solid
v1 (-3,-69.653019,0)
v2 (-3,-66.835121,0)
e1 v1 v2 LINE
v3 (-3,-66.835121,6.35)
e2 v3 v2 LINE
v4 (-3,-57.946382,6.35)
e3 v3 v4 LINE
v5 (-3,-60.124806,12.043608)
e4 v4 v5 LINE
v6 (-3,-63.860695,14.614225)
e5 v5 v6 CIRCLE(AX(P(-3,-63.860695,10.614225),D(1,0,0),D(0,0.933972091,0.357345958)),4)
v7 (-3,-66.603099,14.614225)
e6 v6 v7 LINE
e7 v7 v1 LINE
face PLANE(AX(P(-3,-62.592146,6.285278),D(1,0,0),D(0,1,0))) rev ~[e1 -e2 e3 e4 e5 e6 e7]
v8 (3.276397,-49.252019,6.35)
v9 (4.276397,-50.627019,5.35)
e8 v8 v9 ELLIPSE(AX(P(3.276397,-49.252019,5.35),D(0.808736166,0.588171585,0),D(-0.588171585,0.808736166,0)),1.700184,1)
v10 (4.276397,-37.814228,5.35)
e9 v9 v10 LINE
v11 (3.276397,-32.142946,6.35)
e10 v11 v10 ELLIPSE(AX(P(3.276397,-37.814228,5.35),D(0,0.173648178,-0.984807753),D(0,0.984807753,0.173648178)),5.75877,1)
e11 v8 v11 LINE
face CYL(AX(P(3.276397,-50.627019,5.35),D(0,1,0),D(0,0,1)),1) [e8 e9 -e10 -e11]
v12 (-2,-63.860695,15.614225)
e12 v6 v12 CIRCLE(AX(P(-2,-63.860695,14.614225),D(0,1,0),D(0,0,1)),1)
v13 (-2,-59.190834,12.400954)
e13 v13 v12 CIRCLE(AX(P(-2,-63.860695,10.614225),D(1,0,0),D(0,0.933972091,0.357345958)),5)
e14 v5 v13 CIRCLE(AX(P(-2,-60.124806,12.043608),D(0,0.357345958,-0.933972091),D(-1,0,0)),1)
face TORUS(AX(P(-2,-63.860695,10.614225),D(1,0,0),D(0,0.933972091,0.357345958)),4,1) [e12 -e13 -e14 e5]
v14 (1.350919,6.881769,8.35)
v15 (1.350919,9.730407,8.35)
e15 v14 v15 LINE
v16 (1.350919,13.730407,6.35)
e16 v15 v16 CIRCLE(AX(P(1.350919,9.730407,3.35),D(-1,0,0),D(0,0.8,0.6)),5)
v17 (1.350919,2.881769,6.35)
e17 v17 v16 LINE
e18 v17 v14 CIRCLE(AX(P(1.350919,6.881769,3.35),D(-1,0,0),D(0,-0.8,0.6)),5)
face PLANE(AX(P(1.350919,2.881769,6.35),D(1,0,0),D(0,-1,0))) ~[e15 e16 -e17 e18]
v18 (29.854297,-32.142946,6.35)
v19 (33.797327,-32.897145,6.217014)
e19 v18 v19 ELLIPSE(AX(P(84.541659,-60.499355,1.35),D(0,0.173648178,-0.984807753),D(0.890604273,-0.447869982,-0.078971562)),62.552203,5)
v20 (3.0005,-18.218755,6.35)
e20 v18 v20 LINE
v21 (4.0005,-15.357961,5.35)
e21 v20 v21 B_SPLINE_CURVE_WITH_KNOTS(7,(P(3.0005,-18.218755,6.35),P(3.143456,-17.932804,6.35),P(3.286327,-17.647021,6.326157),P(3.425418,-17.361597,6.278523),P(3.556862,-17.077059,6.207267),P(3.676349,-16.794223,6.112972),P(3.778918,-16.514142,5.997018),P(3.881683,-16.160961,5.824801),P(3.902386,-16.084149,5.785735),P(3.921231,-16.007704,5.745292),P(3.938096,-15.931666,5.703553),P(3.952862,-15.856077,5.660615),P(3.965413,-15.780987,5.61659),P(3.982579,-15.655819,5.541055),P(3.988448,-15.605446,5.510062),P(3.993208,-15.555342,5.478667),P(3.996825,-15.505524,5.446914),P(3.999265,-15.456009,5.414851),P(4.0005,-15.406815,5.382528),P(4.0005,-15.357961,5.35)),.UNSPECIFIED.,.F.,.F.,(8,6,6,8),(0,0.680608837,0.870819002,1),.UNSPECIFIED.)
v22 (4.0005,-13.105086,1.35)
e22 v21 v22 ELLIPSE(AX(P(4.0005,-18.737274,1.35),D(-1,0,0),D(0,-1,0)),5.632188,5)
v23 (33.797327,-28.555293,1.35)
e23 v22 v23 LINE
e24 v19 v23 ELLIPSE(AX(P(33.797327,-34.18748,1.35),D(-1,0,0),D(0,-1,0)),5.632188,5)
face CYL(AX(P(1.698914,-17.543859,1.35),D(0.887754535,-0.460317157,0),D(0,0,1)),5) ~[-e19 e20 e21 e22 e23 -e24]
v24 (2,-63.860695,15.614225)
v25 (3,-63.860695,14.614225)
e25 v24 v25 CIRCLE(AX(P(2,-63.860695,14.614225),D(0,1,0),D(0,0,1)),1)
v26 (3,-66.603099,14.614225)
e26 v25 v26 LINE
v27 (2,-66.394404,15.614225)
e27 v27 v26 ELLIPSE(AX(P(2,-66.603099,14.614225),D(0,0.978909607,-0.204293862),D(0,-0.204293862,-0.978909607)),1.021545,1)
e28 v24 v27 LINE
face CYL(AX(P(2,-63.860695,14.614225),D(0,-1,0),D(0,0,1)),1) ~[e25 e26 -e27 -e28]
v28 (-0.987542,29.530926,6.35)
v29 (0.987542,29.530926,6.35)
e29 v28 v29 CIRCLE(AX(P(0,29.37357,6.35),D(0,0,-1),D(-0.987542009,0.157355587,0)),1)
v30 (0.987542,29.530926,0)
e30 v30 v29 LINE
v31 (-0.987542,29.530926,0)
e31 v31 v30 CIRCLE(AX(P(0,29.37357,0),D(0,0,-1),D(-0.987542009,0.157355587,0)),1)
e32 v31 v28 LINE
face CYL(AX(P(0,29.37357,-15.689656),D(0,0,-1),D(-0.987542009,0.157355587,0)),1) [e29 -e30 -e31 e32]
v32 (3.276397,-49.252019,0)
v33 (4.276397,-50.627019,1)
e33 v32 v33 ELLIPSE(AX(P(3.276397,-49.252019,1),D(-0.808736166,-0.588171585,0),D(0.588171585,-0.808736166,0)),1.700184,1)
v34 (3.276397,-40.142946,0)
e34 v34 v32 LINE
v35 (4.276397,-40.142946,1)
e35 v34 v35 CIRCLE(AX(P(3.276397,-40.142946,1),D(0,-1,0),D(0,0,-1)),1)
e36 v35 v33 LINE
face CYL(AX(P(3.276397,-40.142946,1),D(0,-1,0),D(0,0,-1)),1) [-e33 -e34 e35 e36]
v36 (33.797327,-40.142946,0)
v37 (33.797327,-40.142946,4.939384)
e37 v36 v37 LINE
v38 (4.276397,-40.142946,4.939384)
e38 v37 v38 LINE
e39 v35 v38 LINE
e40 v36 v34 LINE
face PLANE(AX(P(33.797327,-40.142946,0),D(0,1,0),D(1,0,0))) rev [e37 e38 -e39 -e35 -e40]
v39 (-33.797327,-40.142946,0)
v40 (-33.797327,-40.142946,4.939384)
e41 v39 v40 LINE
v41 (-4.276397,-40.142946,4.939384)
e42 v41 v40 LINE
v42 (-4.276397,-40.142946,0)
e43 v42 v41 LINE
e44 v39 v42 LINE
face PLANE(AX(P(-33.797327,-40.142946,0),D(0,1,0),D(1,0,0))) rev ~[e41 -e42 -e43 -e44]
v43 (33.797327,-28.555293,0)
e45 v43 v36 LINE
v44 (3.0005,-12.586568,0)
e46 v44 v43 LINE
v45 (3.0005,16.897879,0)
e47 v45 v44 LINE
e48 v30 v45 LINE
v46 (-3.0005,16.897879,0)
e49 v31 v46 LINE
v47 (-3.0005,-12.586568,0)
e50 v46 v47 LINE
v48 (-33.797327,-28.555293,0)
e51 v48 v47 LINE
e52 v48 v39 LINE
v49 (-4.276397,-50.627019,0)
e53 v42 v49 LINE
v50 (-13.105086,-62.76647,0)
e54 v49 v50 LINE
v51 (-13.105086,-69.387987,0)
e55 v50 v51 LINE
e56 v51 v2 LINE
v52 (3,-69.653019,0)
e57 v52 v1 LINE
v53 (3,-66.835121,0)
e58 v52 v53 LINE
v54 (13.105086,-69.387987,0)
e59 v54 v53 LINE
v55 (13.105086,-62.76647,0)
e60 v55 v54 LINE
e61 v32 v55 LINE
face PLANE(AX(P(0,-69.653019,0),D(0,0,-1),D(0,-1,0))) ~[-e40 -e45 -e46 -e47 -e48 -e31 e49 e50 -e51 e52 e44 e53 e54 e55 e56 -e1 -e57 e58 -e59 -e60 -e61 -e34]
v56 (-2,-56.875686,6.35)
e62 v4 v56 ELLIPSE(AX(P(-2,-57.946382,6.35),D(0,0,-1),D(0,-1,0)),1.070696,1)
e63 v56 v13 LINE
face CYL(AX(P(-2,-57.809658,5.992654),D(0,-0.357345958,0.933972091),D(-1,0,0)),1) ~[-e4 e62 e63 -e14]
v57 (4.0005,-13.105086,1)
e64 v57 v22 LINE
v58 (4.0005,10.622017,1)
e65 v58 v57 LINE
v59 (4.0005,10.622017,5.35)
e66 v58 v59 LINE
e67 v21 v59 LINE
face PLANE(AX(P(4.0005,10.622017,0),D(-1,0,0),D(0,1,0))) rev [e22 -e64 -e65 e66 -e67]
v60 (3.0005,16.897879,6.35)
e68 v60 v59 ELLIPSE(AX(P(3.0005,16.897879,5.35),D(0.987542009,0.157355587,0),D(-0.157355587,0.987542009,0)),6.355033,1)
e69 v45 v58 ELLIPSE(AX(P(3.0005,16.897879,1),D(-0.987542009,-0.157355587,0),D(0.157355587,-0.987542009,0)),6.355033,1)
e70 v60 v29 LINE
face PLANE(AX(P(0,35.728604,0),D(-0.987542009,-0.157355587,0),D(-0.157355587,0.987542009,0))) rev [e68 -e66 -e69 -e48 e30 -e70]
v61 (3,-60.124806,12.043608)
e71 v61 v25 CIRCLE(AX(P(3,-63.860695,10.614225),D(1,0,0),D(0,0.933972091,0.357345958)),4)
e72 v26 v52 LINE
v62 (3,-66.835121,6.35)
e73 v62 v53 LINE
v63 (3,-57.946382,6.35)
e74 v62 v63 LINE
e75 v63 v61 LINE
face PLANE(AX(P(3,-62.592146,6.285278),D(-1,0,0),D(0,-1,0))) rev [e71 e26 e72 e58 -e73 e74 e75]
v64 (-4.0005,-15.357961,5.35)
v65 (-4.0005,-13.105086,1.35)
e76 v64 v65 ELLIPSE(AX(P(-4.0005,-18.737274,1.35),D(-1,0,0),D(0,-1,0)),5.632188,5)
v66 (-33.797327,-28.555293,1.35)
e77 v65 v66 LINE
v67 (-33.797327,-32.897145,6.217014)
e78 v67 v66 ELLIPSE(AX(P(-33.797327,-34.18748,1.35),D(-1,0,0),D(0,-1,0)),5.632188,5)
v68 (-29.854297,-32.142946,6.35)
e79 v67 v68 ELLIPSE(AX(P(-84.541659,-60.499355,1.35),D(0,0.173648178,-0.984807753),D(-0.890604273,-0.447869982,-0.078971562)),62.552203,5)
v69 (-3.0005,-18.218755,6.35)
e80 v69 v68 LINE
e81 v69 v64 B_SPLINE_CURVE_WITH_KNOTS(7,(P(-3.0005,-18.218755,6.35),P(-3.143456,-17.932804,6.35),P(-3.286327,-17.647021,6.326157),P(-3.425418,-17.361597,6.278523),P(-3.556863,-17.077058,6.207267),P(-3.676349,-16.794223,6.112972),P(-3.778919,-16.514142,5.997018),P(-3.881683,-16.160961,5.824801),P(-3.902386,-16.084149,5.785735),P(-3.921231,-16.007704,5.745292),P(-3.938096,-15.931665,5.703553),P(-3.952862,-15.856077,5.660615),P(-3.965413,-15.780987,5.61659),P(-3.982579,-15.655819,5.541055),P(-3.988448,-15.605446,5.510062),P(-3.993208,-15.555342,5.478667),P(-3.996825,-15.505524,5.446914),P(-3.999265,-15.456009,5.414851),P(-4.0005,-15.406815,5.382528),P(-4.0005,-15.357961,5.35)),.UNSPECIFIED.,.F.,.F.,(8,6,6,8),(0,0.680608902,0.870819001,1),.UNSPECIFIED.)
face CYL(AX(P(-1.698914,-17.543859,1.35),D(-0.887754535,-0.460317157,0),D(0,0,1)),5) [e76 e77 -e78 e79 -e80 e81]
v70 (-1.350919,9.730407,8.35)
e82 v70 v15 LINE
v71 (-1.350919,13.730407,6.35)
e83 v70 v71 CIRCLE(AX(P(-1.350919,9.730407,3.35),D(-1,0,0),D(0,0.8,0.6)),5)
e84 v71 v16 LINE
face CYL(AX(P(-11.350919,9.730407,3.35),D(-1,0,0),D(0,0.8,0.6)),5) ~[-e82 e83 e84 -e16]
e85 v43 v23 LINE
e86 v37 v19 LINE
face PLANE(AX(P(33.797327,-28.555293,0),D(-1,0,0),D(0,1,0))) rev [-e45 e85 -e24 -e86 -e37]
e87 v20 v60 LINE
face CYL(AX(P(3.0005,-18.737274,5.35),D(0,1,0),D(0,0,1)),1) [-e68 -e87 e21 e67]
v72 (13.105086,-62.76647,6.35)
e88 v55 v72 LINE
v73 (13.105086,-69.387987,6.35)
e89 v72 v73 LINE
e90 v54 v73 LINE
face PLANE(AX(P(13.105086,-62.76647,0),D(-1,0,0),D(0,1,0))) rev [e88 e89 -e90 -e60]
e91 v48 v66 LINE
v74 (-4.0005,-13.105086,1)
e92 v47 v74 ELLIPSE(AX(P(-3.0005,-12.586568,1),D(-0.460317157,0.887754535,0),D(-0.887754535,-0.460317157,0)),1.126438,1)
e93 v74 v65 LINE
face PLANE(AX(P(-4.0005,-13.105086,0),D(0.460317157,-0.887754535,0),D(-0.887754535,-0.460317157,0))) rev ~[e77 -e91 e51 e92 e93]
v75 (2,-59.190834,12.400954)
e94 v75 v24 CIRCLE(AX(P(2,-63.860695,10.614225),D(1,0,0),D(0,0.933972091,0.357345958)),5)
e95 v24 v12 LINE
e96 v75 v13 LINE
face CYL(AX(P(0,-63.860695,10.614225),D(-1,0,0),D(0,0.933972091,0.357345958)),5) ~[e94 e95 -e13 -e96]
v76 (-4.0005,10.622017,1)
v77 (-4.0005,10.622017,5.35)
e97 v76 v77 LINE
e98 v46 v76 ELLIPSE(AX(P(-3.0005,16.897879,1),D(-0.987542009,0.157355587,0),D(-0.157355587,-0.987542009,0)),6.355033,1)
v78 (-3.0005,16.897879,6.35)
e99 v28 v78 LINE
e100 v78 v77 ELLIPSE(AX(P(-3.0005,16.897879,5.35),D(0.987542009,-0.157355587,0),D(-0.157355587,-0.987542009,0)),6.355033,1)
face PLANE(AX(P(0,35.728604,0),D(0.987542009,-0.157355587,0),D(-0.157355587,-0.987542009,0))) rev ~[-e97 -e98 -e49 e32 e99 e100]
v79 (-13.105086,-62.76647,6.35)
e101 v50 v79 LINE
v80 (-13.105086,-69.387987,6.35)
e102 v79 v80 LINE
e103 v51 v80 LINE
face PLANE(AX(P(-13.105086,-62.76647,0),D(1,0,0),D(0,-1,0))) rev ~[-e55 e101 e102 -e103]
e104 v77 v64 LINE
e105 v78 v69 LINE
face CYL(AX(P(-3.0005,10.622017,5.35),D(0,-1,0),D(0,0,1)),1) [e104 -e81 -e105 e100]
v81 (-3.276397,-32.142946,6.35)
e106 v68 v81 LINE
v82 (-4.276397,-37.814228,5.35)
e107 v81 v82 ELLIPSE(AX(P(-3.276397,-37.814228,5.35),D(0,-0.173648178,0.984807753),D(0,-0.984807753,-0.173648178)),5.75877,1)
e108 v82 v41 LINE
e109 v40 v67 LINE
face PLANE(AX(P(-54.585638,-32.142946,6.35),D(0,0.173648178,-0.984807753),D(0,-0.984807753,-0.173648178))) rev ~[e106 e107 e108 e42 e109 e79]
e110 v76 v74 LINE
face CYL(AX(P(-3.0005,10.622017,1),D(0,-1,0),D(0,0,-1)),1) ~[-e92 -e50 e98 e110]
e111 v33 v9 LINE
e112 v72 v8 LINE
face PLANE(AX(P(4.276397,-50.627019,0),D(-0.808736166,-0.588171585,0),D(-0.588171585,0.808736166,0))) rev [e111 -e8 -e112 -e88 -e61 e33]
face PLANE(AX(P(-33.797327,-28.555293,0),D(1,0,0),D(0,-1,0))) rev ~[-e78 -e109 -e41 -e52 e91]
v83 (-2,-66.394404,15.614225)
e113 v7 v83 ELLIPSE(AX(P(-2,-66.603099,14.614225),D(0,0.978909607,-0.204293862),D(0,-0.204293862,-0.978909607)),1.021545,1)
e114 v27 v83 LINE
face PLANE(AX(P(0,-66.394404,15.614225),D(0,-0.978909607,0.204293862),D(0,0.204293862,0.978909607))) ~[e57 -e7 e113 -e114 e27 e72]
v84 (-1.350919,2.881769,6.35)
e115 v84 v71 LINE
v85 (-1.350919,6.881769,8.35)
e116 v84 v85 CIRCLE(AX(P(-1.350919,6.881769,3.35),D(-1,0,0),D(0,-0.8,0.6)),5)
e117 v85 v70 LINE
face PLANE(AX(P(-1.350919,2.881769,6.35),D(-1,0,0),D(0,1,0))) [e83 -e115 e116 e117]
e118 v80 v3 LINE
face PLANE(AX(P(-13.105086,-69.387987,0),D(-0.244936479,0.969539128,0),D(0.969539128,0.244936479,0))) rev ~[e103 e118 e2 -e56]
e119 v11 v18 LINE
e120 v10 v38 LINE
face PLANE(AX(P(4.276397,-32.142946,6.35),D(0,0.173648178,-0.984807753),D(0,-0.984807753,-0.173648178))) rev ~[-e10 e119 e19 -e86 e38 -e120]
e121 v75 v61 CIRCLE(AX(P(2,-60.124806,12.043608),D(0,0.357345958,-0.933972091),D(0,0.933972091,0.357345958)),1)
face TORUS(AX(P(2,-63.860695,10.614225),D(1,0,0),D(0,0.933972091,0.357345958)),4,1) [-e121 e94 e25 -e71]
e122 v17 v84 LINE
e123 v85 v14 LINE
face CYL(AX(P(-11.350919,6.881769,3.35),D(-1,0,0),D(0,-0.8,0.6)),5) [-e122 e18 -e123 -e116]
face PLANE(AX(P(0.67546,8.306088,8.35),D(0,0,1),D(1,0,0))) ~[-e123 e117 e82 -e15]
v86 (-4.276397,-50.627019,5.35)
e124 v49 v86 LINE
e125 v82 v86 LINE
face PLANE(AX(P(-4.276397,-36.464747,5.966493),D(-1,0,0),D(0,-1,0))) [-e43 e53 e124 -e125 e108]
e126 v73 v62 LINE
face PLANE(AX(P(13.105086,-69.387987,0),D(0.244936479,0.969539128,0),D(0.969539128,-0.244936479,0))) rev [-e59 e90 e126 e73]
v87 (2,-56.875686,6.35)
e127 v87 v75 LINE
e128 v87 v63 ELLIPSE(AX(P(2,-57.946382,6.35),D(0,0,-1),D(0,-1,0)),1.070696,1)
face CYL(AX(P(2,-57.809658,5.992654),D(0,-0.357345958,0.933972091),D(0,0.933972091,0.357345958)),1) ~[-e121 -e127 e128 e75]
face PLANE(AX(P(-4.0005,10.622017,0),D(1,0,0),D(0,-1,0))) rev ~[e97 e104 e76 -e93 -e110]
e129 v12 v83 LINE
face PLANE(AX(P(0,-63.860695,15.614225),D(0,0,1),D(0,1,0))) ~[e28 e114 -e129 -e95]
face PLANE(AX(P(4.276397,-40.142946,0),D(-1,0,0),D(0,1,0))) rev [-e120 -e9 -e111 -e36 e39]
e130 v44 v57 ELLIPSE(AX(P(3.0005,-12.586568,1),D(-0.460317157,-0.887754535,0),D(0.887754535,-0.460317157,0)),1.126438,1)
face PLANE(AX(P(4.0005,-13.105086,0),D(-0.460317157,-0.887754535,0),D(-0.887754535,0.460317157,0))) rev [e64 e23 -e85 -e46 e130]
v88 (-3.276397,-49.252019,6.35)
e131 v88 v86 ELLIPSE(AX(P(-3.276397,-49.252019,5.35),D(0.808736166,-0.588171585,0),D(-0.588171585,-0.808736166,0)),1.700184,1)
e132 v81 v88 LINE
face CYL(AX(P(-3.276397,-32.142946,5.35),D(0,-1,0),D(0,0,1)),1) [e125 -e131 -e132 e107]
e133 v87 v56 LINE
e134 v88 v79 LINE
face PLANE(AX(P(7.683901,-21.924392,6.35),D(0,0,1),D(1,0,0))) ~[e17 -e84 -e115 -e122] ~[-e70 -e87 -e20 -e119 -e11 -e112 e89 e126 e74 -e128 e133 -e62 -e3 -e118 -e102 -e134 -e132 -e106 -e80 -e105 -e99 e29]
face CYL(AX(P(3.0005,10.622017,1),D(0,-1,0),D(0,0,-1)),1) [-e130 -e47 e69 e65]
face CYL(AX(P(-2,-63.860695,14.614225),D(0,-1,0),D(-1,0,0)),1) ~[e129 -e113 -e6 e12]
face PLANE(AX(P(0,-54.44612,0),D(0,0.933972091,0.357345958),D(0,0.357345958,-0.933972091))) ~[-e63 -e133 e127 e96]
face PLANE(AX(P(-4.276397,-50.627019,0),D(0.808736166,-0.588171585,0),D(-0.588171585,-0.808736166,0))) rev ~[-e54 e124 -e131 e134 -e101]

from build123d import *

# Parameters (mm, degrees)
F1_DEPTH      = 6.35
F2_W          = 1.3509193668
F2_H          = 10.8486381359
F3_DEPTH      = 2
F5_DEPTH      = 3
F7_R          = 5
F8_T1_DEPTH   = 22.7018387336
F9_T1_DEPTH   = 22.7018387336
F10_T1_DEPTH  = 37.7293119504
F11_T1_DEPTH  = 50.3092406281
F11_T3_DEPTH  = 50.3092406281
F11_T8_DEPTH  = 71.0975509994
F11_T13_DEPTH = 71.0975509994
F12_R         = 1
F13_R         = 1
F14_R         = 1
F15_R         = 1


# Not quite as in the source:
# - a fillet or chamfer that OpenCascade refuses, or shapes differently, is made with other operations: its cross-section is extruded or revolved along the edge and cut away or added


with BuildPart() as f1:
    # F0 (on Top) → F1 (new body)
    with BuildSketch(Plane.XY):
        Polygon((0, -66.0772249103), (0, 35.7286036015), (-4.0004998446, 10.6220170856), (-4.0004998446, -13.1050860509), (-33.7973274291, -28.5552926362), (-33.7973274291, -40.1429459453), (-4.2763971724, -40.1429459453), (-4.2763971724, -50.6270192564), (-13.1050860509, -62.766470015), (-13.1050860509, -69.3879872561), align=None)
    extrude(amount=F1_DEPTH)

    # F2 (on face) → F3 (join)
    with BuildSketch(Plane.XY.offset(6.35)):
        with Locations((-0.6754596834, 8.3060876932)):
            Rectangle(F2_W, F2_H)
    extrude(amount=F3_DEPTH)

    # F4 (on Right) → F5 (join)
    with BuildSketch(Plane.YZ):
        with BuildLine():
            Line((-69.653019309, 0), (-54.4461198151, 0))
            Line((-54.4461198151, 0), (-59.1908343158, 12.4009543867))
            ThreePointArc((-59.1908343158, 12.4009543867), (-61.0264090525, 14.733305135), (-63.8606947699, 15.6142245978))
            Line((-63.8606947699, 15.6142245978), (-66.3944035769, 15.6142245978))
            Line((-66.3944035769, 15.6142245978), (-69.653019309, 0))
        make_face()
    extrude(amount=-F5_DEPTH)

    # F6: F1 across face


with BuildPart() as f1_1:
    add(f1.part)
    add(f1.part.mirror(Plane(origin=(0, -20.6881401181, 4.0270783), x_dir=(0, 1, 0), z_dir=(1, 0, 0))))

    # F7
    f7_edges = [f1_1.edges().sort_by_distance(p)[0] for p in [
        (-18.898914, -20.830189, 6.35),
        (18.898914, -20.830189, 6.35),
    ]]
    fillet(f7_edges, radius=F7_R)

    # F8: fillet of radius 5 on 1 edges, made by hand

    # F8_s2 → F8_t1 (cut)
    with BuildSketch(Plane.YZ.offset(-11.3509193668)):
        with BuildLine():
            ThreePointArc((13.7304067612, 6.35), (11.9664747387, 7.822135955), (9.7304067612, 8.35))
            Line((9.7304067612, 8.35), (13.7304067612, 8.35))
            Line((13.7304067612, 8.35), (13.7304067612, 6.35))
        make_face()
    extrude(amount=F8_T1_DEPTH, mode=Mode.SUBTRACT)

    # F9: fillet of radius 5 on 1 edges, made by hand

    # F9_s2 → F9_t1 (cut)
    with BuildSketch(Plane.YZ.offset(-11.3509193668)):
        with BuildLine():
            ThreePointArc((2.8817686252, 6.35), (4.6457006477, 7.822135955), (6.8817686252, 8.35))
            Line((6.8817686252, 8.35), (2.8817686252, 8.35))
            Line((2.8817686252, 8.35), (2.8817686252, 6.35))
        make_face()
    extrude(amount=F9_T1_DEPTH, mode=Mode.SUBTRACT)

    # F10: fillet of radius 1 on 1 edges, made by hand

    # F10_s2 → F10_t1 (cut)
    with BuildSketch(Plane.XY.offset(-15.6896559752)):
        with BuildLine():
            ThreePointArc((-0.9875420089, 29.5309258493), (0, 30.3735702625), (0.9875420089, 29.5309258493))
            Line((0.9875420089, 29.5309258493), (0, 35.7286036015))
            Line((0, 35.7286036015), (-0.9875420089, 29.5309258493))
        make_face()
    extrude(amount=F10_T1_DEPTH, mode=Mode.SUBTRACT)

    # F11: chamfer of 8 x 1.4106158457 on 2 edges, made by hand

    # F11_s2 → F11_t1 (cut)
    with BuildSketch(Plane.YZ.offset(-54.5856378004)):
        Polygon((-32.1429459453, 6.35), (-40.1429459453, 4.9393841543), (-40.1429459453, 6.35), align=None)
    extrude(amount=F11_T1_DEPTH, mode=Mode.SUBTRACT)

    # F11_s4 → F11_t3 (cut)
    with BuildSketch(Plane.YZ.offset(4.2763971724)):
        Polygon((-32.1429459453, 6.35), (-40.1429459453, 4.9393841543), (-40.1429459453, 6.35), align=None)
    extrude(amount=F11_T3_DEPTH, mode=Mode.SUBTRACT)


with BuildPart() as f11_tool6:
    # F11_s7 → F11_t8 (new body)
    with BuildSketch(Plane.YZ.offset(-54.5856378004)):
        Polygon((-32.1429459453, 6.35), (-40.1429459453, 4.9393841543), (-40.1429459453, 6.35), align=None)
    extrude(amount=F11_T8_DEPTH)

    split(bisect_by=Plane.YZ.offset(4.2763971724), keep=Keep.TOP)


with BuildPart() as f1_2:
    add(f1_1.part)

    # F11_t5: cut F11_tool6
    add(f11_tool6.part, mode=Mode.SUBTRACT)


with BuildPart() as f11_tool11:
    # F11_s12 → F11_t13 (new body)
    with BuildSketch(Plane.YZ.offset(54.5856378004)):
        Polygon((-32.1429459453, 6.35), (-40.1429459453, 4.9393841543), (-40.1429459453, 6.35), align=None)
    extrude(amount=-F11_T13_DEPTH)

    split(bisect_by=Plane.YZ.offset(-4.2763971724), keep=Keep.BOTTOM)


with BuildPart() as f1_3:
    add(f1_2.part)

    # F11_t10: cut F11_tool11
    add(f11_tool11.part, mode=Mode.SUBTRACT)

    # F12
    f12_edges = [f1_3.edges().sort_by_distance(p)[0] for p in [
        (-3, -58.03326, 9.375477),
    ]]
    fillet(f12_edges, radius=F12_R)

    # F13
    f13_edges = [f1_3.edges().sort_by_distance(p)[0] for p in [
        (3, -58.03326, 9.375477),
    ]]
    fillet(f13_edges, radius=F13_R)

    # F14
    f14_edges = [f1_3.edges().sort_by_distance(p)[0] for p in [
        (4.0005, -4.057628, 6.35),
        (-4.0005, -4.057628, 6.35),
        (-4.276397, -41.384983, 6.35),
        (4.276397, -41.384983, 6.35),
    ]]
    fillet(f14_edges, radius=F14_R)

    # F15
    f15_edges = [f1_3.edges().sort_by_distance(p)[0] for p in [
        (4.0005, -1.241534, 0),
        (-4.0005, -1.241534, 0),
        (4.276397, -45.384983, 0),
    ]]
    fillet(f15_edges, radius=F15_R)


solid = f1_3.part
